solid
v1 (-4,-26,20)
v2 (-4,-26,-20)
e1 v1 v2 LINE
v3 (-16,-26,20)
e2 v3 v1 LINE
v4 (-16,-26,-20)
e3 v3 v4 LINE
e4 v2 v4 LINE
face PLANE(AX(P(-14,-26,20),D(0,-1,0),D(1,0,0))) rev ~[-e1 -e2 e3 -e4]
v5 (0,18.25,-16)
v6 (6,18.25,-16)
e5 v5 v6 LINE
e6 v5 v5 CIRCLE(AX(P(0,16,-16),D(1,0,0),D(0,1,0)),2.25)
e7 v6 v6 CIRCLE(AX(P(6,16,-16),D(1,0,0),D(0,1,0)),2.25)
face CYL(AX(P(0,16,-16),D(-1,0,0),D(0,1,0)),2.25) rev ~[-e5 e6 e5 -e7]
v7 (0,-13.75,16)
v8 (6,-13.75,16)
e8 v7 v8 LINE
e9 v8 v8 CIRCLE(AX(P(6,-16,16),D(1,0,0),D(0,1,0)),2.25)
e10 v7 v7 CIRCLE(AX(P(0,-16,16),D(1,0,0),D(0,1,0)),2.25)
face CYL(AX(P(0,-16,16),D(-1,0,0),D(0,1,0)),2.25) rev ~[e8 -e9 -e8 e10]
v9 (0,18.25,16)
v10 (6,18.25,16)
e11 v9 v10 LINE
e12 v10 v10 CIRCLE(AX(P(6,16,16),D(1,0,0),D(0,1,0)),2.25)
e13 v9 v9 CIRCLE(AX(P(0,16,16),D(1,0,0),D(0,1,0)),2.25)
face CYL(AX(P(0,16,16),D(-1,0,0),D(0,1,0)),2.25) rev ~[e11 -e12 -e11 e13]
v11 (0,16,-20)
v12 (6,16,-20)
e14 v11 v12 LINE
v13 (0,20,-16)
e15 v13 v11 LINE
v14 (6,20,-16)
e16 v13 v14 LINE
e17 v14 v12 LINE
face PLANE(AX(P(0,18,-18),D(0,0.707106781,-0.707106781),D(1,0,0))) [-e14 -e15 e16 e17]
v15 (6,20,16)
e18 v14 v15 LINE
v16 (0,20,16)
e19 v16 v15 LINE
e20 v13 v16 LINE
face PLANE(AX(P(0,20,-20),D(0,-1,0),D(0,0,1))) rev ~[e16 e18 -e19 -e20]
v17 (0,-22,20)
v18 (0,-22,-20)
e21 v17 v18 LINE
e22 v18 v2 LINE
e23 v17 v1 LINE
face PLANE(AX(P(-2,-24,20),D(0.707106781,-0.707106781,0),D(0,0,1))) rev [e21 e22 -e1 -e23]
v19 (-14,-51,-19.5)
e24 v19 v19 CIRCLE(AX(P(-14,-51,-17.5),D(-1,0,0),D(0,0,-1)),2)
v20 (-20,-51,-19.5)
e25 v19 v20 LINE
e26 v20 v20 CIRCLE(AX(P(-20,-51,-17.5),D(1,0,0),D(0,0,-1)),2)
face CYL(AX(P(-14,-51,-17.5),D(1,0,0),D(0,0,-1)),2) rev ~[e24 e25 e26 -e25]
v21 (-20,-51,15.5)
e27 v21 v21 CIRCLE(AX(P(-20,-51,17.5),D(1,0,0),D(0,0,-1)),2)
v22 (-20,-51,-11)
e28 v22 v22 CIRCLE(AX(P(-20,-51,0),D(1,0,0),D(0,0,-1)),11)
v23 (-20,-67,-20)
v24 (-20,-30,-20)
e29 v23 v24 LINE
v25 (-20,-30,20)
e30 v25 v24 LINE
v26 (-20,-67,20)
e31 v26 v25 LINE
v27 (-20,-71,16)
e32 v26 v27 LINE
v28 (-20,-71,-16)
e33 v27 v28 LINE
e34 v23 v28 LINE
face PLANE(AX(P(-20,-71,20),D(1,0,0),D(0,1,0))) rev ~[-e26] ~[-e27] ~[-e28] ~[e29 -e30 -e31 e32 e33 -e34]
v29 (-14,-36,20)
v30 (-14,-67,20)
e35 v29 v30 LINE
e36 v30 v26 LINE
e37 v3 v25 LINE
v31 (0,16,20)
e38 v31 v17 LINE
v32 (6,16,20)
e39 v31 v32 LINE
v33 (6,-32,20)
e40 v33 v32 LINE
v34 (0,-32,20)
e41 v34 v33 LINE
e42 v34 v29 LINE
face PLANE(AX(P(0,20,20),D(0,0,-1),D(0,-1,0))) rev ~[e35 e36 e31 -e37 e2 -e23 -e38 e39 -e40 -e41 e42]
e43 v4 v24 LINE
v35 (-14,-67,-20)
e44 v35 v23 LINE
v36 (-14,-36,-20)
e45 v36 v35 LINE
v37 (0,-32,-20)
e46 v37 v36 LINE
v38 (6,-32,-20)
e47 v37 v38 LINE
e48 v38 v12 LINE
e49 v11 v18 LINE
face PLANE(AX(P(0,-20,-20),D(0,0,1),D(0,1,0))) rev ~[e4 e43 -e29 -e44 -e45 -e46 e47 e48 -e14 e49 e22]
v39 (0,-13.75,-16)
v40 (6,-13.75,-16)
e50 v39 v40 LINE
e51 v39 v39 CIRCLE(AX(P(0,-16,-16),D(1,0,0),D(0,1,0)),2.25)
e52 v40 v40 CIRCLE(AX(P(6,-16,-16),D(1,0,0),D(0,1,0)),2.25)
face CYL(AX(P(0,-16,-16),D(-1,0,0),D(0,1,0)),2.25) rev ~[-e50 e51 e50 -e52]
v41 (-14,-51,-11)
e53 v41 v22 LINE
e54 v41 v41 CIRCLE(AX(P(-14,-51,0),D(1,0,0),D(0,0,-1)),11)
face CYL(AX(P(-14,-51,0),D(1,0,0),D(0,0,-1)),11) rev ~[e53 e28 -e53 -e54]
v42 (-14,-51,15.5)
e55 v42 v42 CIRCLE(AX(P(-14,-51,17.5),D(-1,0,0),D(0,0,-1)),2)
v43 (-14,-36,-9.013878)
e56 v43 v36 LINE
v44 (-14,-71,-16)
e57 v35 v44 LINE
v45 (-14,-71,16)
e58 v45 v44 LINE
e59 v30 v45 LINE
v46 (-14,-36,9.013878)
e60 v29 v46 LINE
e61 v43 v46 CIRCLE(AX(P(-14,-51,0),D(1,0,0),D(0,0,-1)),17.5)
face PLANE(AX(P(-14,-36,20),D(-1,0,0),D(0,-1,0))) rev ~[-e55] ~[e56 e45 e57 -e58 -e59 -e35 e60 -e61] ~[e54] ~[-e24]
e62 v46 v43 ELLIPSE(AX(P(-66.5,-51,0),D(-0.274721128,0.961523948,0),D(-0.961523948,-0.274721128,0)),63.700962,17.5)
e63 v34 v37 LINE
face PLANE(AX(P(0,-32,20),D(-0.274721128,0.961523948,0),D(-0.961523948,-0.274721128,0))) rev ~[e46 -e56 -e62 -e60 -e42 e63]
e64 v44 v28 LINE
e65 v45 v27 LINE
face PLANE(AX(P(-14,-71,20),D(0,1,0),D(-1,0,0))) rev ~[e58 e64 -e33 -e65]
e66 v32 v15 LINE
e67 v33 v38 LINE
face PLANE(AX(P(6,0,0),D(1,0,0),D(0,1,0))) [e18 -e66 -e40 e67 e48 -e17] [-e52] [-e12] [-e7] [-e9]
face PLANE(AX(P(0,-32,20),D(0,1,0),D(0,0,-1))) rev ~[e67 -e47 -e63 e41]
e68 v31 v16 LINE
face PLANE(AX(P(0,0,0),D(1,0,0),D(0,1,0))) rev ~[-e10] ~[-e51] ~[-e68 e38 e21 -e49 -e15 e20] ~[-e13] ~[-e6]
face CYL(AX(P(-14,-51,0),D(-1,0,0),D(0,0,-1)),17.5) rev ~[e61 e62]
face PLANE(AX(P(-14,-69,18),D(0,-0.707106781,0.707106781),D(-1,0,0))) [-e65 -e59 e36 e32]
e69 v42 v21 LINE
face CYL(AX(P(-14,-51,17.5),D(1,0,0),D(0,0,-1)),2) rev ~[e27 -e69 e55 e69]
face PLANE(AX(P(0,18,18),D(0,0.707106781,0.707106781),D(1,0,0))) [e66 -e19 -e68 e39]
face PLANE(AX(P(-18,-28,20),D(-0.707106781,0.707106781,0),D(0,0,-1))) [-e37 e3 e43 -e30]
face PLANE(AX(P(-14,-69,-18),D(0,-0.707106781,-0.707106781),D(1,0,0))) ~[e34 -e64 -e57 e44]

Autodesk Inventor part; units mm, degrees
ref_plane "YZ Plane" through (0, 0, 0) normal (1, 0, 0) x (0, 1, 0)
ref_plane "XZ Plane" through (0, 0, 0) normal (0, 1, 0) x (-1, 0, 0)
ref_plane "XY Plane" through (0, 0, 0) normal (0, 0, 1) x (1, 0, 0)
sketch "Skizze1" plane through (0, 0, 0) normal (1, 0, 0) x (0, 1, 0)
  line L0 (-20, -20) -> (20, -20)
  line L1 (20, -20) -> (20, 20)
  line L2 (20, 20) -> (-20, 20)
  line L3 (-20, 20) -> (-20, -20)
  line L4 (-20, -20) -> (20, 20) construction
  line L5 (20, -20) -> (-20, 20) construction
  line L6 (-16, -16) -> (16, -16) construction
  line L7 (16, -16) -> (16, 16) construction
  line L8 (16, 16) -> (-16, 16) construction
  line L9 (-16, 16) -> (-16, -16) construction
  line L10 (-16, -16) -> (16, 16) construction
  line L11 (16, -16) -> (-16, 16) construction
  circle A0 centre (16, 16) radius 2.25
  circle A1 centre (16, -16) radius 2.25
  circle A2 centre (-16, -16) radius 2.25
  circle A3 centre (-16, 16) radius 2.25
  line L12 (-20, 20) -> (-32, 20)
  line L13 (-32, 20) -> (-32, -20)
  line L14 (-32, -20) -> (-20, -20)
  line L15 (-20, -20) -> (-20, 20)
  point P0 (0, 0)
  dimension "d0" = 40
  dimension "d1" = 40
  dimension "d2" = 32
  dimension "d3" = 32
  dimension "d4" = 4.5
  dimension "d5" = 4.5
  dimension "d6" = 4.5
  dimension "d7" = 4.5
  dimension "d8" = 12
extrude "Extrusion1" add sketch "Skizze1" along normal blind 6
ref_plane "Arbeitsebene1" through (0, -32, 20) normal (0, 0, 1) x (1, 0, 0)
sketch "Skizze2" plane through (0, -32, 20) normal (0, 0, 1) x (1, 0, 0)
  line L0 (0, 52) -> (0, 0) projected
  line L1 (0, 0) -> (6, 0) projected
  line L2 (6, 52) -> (6, 0) projected
  line L3 (0, 52) -> (6, 52) projected
  line L4 (-20, 6) -> (-14, 6)
  line L5 (-14, 6) -> (-14, -39)
  line L6 (-14, -39) -> (-20, -39)
  line L7 (-20, -39) -> (-20, 6)
  line L8 (0, 0) -> (-14, -4)
  line L9 (-14, 6) -> (0, 6)
  point P0 (0, 32)
  point P1 (-17, -39)
  point P2 (-17, 6)
  dimension "d12" = 6
  dimension "d13" = 45
  dimension "d14" = 6
  dimension "d15" = 14
  dimension "d16" = 10
extrude "Extrusion2" add sketch "Skizze2" against normal up to surface (40 mm away) contours L0 L8 L5 L9 | L5 L6 L7 L4
chamfer "Fasen1" distance 4 angle 45 6 edges at (-20, -26, 0) (0, -26, 0) (-17, -71, -20) (-17, -71, 20) (3, 20, -20) (3, 20, 20)
sketch "Skizze3" plane through (-14, -36, 20) normal (1, 0, 0) x (0, 0, -1)
  line L0 (4, -35) -> (0, -31) projected
  line L1 (4, -35) -> (36, -35) projected
  line L2 (40, -31) -> (36, -35) projected
  line L3 (40, 0) -> (40, -31) projected
  line L4 (0, 0) -> (40, 0) projected
  line L5 (0, -31) -> (0, 0) projected
  circle A0 centre (20, -15) radius 20
  circle A1 centre (20, -15) radius 17.5
  point P0 (20, 36)
  dimension "d22" = 35
extrude "Extrusion3" cut sketch "Skizze3" along normal through all contours A1 L4 | L4 A1
sketch "Skizze4" plane through (-14, -67, 20) normal (1, 0, 0) x (0, 0, -1)
  line L0 (0, 31) -> (10.9861, 31) projected
  line L1 (0, 0) -> (0, 31) projected
  line L2 (4, -4) -> (0, 0) projected
  line L3 (4, -4) -> (36, -4) projected
  line L4 (40, 0) -> (36, -4) projected
  line L5 (40, 31) -> (40, 0) projected
  line L6 (29.0139, 31) -> (40, 31) projected
  arc A0 (29.0139, 31) -> (10.9861, 31) centre (20, 16) ccw projected
  circle A1 centre (20, 16) radius 17.5
  circle A2 centre (2.5, 16) radius 2
  circle A3 centre (37.5, 16) radius 2
  point P0 (20, 67)
  dimension "d25" = 4
  dimension "d26" = 4
extrude "Extrusion4" cut sketch "Skizze4" against normal blind 10 contours A2 A1 | A1 A2 | A3 A1 | A1 A3
sketch "Skizze5" plane through (-14, -67, 20) normal (1, 0, 0) x (0, 0, -1)
  arc A0 (29.0139, 31) -> (10.9861, 31) centre (20, 16) ccw projected
  line L0 (0, 35) -> (40, 35) projected
  line L1 (0, 31) -> (0, 35) projected
  line L2 (0, 31) -> (10.9861, 31) projected
  circle A1 centre (20, 16) radius 11
  line L3 (29.0139, 31) -> (40, 31) projected
  line L4 (40, 35) -> (40, 31) projected
  point P0 (20, 67)
  dimension "d29" = 22
extrude "Extrusion5" cut sketch "Skizze5" against normal blind 10 contours A1
properties part number "40_XYZstage_micrometer_motorized_nema8_samplemount_lightsheet_screwed"
